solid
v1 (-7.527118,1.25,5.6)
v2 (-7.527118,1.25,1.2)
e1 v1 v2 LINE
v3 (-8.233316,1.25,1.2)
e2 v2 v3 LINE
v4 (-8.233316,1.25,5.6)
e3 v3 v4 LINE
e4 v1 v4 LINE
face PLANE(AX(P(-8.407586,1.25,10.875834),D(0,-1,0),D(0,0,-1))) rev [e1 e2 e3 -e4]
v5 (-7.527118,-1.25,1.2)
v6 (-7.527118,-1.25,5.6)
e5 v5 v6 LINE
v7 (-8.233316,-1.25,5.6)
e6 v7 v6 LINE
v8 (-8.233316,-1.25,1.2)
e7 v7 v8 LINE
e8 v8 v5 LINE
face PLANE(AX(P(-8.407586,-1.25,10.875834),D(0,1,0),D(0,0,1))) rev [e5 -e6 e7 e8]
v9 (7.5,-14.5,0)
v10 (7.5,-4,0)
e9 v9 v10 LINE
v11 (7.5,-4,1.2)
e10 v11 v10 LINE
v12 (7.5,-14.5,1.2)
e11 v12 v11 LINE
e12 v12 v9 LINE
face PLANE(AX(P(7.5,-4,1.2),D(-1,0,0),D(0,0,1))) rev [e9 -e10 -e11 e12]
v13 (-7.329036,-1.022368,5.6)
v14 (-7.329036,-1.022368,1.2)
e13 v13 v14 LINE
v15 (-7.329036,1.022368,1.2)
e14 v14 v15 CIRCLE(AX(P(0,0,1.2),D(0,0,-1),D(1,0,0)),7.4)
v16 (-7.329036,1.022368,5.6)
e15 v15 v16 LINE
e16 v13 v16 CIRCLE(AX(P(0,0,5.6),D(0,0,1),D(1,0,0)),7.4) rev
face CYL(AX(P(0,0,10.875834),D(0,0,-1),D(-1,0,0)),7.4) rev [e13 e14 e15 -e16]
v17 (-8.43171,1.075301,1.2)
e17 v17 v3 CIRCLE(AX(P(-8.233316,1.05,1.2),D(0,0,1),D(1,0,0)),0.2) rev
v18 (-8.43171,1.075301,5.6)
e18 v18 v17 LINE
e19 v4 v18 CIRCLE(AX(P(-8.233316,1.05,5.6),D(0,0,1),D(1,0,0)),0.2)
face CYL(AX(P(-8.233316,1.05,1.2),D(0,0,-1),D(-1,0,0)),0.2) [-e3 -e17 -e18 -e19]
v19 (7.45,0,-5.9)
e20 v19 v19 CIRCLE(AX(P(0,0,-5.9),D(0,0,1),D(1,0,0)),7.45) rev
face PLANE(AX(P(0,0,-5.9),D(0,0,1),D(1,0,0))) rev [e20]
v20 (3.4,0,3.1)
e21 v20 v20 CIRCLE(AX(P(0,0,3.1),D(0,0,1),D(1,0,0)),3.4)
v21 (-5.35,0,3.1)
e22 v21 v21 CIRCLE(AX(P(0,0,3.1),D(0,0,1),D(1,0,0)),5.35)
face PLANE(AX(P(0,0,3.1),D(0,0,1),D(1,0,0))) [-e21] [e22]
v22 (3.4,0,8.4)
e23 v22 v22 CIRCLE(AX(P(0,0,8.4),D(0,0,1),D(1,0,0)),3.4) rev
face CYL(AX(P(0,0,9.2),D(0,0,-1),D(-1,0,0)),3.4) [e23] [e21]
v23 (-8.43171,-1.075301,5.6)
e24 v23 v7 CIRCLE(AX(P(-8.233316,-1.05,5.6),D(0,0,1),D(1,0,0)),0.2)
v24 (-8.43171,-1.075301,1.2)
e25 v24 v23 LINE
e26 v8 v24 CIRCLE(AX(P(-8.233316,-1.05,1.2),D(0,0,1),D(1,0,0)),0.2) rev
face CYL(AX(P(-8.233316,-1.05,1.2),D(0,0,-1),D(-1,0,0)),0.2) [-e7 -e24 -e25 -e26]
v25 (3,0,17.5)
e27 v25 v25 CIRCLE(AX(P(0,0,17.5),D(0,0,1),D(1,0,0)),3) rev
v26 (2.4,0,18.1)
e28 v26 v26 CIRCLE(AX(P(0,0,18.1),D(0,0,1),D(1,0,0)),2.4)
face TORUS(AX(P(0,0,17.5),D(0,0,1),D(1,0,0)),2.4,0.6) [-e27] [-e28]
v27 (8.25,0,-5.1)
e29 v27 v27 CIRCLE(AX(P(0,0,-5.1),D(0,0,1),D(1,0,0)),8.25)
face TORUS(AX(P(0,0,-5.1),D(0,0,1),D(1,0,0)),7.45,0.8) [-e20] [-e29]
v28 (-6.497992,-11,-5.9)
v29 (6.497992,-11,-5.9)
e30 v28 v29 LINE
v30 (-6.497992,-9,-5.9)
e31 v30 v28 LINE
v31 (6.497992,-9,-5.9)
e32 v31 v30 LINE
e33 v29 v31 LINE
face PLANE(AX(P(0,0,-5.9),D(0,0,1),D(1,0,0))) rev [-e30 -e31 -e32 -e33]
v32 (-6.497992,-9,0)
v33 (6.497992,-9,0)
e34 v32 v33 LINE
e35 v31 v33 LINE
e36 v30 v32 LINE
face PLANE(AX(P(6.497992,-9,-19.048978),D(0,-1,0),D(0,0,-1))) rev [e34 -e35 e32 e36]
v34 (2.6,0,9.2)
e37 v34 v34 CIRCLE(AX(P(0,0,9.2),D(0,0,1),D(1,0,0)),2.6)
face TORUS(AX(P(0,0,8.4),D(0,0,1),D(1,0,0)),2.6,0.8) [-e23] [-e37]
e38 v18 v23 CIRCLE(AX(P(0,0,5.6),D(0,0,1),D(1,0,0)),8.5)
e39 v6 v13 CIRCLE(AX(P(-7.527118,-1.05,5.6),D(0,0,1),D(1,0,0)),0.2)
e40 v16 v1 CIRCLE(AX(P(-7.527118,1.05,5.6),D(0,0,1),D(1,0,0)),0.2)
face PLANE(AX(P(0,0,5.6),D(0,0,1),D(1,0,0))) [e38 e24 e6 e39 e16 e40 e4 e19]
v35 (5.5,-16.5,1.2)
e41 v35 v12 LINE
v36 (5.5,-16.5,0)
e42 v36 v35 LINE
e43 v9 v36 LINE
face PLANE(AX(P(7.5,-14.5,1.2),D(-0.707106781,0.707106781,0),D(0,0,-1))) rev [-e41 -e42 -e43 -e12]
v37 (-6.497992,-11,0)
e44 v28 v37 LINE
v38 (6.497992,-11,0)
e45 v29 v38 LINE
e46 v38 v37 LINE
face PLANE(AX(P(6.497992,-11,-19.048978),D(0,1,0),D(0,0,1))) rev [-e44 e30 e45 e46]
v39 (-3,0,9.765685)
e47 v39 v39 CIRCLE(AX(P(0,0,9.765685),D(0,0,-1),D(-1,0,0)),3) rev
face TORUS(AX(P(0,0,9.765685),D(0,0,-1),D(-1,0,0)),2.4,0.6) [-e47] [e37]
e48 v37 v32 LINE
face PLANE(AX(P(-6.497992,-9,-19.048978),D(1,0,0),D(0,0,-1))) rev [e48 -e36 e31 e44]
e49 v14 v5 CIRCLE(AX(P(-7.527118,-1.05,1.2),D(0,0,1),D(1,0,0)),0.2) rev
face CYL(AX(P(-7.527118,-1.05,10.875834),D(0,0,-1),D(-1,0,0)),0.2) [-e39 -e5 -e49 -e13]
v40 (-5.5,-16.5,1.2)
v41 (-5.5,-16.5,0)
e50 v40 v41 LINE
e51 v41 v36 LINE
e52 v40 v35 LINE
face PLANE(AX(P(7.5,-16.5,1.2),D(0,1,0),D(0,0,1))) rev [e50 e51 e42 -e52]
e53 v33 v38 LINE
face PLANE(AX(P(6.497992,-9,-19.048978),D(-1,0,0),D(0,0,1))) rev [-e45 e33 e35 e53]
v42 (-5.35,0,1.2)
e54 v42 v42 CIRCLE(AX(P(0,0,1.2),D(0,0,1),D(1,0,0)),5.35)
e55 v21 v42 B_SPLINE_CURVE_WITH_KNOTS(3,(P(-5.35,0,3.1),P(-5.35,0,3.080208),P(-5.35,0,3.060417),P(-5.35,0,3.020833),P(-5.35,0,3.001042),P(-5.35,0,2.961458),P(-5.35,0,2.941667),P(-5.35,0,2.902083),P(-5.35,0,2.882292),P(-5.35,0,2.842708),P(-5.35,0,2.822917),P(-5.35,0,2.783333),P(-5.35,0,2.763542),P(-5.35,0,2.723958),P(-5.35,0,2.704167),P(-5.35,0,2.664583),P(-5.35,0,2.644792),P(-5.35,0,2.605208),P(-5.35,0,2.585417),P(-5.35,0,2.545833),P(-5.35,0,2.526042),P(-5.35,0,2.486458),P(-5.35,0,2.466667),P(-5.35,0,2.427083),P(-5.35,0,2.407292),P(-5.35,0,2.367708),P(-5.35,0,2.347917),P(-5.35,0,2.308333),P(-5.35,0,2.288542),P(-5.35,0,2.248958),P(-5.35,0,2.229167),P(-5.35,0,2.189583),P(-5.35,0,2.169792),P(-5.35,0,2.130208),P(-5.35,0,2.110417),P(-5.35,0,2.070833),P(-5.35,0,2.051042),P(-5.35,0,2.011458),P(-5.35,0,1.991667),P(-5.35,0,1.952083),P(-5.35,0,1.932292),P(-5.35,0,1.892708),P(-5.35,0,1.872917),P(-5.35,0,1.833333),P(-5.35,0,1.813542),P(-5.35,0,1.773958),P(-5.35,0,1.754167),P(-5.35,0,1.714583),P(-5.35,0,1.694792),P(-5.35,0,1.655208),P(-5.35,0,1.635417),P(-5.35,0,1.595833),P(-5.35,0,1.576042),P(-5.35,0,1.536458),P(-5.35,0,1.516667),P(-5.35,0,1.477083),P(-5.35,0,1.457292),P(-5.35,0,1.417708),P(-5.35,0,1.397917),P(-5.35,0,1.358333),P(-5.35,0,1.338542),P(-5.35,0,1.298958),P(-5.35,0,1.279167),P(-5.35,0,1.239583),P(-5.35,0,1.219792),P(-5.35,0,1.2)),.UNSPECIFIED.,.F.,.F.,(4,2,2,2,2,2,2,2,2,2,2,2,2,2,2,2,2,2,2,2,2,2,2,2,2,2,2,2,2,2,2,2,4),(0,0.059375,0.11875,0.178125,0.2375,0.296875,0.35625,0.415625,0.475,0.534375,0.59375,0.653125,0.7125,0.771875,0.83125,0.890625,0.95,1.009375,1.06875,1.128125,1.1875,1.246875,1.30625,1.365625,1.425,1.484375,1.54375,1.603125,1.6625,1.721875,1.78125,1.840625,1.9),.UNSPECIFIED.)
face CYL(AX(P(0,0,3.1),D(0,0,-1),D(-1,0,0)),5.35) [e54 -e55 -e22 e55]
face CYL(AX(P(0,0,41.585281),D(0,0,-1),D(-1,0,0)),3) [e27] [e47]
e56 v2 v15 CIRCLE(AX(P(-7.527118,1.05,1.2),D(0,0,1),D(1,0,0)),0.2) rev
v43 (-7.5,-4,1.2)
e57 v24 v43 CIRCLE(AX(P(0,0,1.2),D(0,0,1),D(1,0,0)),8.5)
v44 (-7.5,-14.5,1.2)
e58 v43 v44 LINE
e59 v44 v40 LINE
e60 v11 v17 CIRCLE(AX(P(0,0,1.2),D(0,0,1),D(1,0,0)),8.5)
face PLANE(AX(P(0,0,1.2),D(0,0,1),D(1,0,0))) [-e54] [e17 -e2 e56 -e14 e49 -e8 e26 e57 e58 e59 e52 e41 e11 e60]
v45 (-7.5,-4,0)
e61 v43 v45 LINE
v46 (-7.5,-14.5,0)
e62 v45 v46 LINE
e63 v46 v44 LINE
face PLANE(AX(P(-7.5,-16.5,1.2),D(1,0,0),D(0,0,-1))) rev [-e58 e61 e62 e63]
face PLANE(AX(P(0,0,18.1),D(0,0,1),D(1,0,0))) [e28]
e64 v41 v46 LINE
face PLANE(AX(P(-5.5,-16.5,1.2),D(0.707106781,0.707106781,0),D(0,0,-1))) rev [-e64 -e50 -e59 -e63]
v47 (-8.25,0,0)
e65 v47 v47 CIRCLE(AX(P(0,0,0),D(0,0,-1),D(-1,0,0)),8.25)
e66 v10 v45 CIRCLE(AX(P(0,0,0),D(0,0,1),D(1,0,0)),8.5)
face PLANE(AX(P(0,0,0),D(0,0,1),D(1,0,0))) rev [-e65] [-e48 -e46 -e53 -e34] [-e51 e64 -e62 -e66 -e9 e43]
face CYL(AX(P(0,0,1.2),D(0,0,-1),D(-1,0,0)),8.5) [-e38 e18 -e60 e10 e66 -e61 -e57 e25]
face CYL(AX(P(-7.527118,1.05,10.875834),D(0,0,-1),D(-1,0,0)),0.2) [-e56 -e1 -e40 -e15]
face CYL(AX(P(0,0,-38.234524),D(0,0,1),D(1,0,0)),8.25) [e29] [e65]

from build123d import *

# Parameters (mm, degrees)
BOSS_EXTRUDE1_DEPTH = 1.2
SKETCH2_R           = 5.35
BOSS_EXTRUDE2_DEPTH = 1.9
SKETCH3_R           = 3.4
BOSS_EXTRUDE3_DEPTH = 6.1
FILLET2_R           = 0.8
SKETCH4_R           = 3
BOSS_EXTRUDE4_DEPTH = 8.9
SKETCH5_R           = 8.25
BOSS_EXTRUDE5_DEPTH = 5.9
FILLET1_R           = 0.8
SKETCH6_W           = 12.99598454
SKETCH6_H           = 2
BOSS_EXTRUDE6_DEPTH = 5.9
FILLET3_R           = 0.6
CHAMFER1_SIZE       = 2
BOSS_EXTRUDE7_DEPTH = 4.4
FILLET4_R           = 0.2


with BuildPart() as part:
    # Sketch1 → Boss-Extrude1 (new body)
    with BuildSketch(Plane.XY):
        with BuildLine():
            Line((7.5, -4), (7.5, -16.5))
            Line((7.5, -16.5), (-7.5, -16.5))
            Line((-7.5, -16.5), (-7.5, -4))
            ThreePointArc((-7.5, -4), (0, 8.5), (7.5, -4))
        make_face()
    extrude(amount=BOSS_EXTRUDE1_DEPTH)

    # Sketch2 → Boss-Extrude2 (add)
    with BuildSketch(Plane.XY.offset(1.2)):
        with Locations(Location((0, 0, 0), (0, 0, 180))):
            Circle(SKETCH2_R)
    extrude(amount=BOSS_EXTRUDE2_DEPTH)

    # Sketch3 → Boss-Extrude3 (add)
    with BuildSketch(Plane.XY.offset(3.1)):
        Circle(SKETCH3_R)
    extrude(amount=BOSS_EXTRUDE3_DEPTH)

    # Fillet2
    fillet2_edges = [part.edges().sort_by_distance(p)[0] for p in [
        (-3.4, 0, 9.2),
    ]]
    fillet(fillet2_edges, radius=FILLET2_R)

    # Sketch4 → Boss-Extrude4 (add)
    with BuildSketch(Plane.XY.offset(9.2)):
        Circle(SKETCH4_R)
    extrude(amount=BOSS_EXTRUDE4_DEPTH)

    # Sketch5 → Boss-Extrude5 (add)
    with BuildSketch(Plane(origin=(0, 0, 0), x_dir=(-1, 0, 0), z_dir=(0, 0, -1))):
        with Locations(Location((0, 0, 0), (0, 0, 180))):
            Circle(SKETCH5_R)
    extrude(amount=BOSS_EXTRUDE5_DEPTH)

    # Fillet1
    fillet1_edges = [part.edges().sort_by_distance(p)[0] for p in [
        (-8.25, 0, -5.9),
    ]]
    fillet(fillet1_edges, radius=FILLET1_R)

    # Sketch6 → Boss-Extrude6 (add)
    with BuildSketch(Plane(origin=(0, 0, 0), x_dir=(-1, 0, 0), z_dir=(0, 0, -1))):
        with Locations((0, -10)):
            Rectangle(SKETCH6_W, SKETCH6_H)
    extrude(amount=BOSS_EXTRUDE6_DEPTH)

    # Fillet3
    # the kernel refuses this fillet: 0.6 mm, written as the material it takes off along each edge
    with BuildSketch(Plane(origin=(0, 0, 9.2), x_dir=(1, 0, 0), z_dir=(0, -1, 0))) as fillet3_piece_1:
        with BuildLine():
            CenterArc((2.4, 0.565685425), FILLET3_R, 289.471220634, 70.528779366)
            Line((3, 0.565685425), (3, 0))
            Line((3, 0), (2.6, 0))
        make_face()
    revolve(axis=Axis((0, 0, 9.2), (0, 0, 1)), mode=Mode.SUBTRACT)
    with BuildSketch(Plane(origin=(0, 0, 18.1), x_dir=(1, 0, 0), z_dir=(0, -1, 0))) as fillet3_piece_2:
        with BuildLine():
            CenterArc((3 - FILLET3_R, -FILLET3_R), FILLET3_R, 0, 90)
            Line((3 - FILLET3_R, 0), (3, 0))
            Line((3, 0), (3, -FILLET3_R))
        make_face()
    revolve(axis=Axis((0, 0, 18.1), (0, 0, 1)), mode=Mode.SUBTRACT)

    # Chamfer1
    chamfer1_edges = [part.edges().sort_by_distance(p)[0] for p in [
        (7.5, -16.5, 0.6),
        (-7.5, -16.5, 0.6),
    ]]
    chamfer(chamfer1_edges, length=CHAMFER1_SIZE)

    # Sketch8 → Boss-Extrude7 (add)
    with BuildSketch(Plane.XY.offset(1.2)):
        with BuildLine():
            Line((-8.40758586, 1.25), (-7.293661632, 1.25))
            ThreePointArc((-7.293661632, 1.25), (-7.4, 0), (-7.293661632, -1.25))
            Line((-7.293661632, -1.25), (-8.40758586, -1.25))
            ThreePointArc((-8.40758586, -1.25), (-8.5, 0), (-8.40758586, 1.25))
        make_face()
    extrude(amount=BOSS_EXTRUDE7_DEPTH)

    # Fillet4
    fillet4_edges = [part.edges().sort_by_distance(p)[0] for p in [
        (-8.40758586, 1.25, 3.4),
        (-8.40758586, -1.25, 3.4),
        (-7.293661632, -1.25, 3.4),
        (-7.293661632, 1.25, 3.4),
    ]]
    fillet(fillet4_edges, radius=FILLET4_R)


solid = part.part
